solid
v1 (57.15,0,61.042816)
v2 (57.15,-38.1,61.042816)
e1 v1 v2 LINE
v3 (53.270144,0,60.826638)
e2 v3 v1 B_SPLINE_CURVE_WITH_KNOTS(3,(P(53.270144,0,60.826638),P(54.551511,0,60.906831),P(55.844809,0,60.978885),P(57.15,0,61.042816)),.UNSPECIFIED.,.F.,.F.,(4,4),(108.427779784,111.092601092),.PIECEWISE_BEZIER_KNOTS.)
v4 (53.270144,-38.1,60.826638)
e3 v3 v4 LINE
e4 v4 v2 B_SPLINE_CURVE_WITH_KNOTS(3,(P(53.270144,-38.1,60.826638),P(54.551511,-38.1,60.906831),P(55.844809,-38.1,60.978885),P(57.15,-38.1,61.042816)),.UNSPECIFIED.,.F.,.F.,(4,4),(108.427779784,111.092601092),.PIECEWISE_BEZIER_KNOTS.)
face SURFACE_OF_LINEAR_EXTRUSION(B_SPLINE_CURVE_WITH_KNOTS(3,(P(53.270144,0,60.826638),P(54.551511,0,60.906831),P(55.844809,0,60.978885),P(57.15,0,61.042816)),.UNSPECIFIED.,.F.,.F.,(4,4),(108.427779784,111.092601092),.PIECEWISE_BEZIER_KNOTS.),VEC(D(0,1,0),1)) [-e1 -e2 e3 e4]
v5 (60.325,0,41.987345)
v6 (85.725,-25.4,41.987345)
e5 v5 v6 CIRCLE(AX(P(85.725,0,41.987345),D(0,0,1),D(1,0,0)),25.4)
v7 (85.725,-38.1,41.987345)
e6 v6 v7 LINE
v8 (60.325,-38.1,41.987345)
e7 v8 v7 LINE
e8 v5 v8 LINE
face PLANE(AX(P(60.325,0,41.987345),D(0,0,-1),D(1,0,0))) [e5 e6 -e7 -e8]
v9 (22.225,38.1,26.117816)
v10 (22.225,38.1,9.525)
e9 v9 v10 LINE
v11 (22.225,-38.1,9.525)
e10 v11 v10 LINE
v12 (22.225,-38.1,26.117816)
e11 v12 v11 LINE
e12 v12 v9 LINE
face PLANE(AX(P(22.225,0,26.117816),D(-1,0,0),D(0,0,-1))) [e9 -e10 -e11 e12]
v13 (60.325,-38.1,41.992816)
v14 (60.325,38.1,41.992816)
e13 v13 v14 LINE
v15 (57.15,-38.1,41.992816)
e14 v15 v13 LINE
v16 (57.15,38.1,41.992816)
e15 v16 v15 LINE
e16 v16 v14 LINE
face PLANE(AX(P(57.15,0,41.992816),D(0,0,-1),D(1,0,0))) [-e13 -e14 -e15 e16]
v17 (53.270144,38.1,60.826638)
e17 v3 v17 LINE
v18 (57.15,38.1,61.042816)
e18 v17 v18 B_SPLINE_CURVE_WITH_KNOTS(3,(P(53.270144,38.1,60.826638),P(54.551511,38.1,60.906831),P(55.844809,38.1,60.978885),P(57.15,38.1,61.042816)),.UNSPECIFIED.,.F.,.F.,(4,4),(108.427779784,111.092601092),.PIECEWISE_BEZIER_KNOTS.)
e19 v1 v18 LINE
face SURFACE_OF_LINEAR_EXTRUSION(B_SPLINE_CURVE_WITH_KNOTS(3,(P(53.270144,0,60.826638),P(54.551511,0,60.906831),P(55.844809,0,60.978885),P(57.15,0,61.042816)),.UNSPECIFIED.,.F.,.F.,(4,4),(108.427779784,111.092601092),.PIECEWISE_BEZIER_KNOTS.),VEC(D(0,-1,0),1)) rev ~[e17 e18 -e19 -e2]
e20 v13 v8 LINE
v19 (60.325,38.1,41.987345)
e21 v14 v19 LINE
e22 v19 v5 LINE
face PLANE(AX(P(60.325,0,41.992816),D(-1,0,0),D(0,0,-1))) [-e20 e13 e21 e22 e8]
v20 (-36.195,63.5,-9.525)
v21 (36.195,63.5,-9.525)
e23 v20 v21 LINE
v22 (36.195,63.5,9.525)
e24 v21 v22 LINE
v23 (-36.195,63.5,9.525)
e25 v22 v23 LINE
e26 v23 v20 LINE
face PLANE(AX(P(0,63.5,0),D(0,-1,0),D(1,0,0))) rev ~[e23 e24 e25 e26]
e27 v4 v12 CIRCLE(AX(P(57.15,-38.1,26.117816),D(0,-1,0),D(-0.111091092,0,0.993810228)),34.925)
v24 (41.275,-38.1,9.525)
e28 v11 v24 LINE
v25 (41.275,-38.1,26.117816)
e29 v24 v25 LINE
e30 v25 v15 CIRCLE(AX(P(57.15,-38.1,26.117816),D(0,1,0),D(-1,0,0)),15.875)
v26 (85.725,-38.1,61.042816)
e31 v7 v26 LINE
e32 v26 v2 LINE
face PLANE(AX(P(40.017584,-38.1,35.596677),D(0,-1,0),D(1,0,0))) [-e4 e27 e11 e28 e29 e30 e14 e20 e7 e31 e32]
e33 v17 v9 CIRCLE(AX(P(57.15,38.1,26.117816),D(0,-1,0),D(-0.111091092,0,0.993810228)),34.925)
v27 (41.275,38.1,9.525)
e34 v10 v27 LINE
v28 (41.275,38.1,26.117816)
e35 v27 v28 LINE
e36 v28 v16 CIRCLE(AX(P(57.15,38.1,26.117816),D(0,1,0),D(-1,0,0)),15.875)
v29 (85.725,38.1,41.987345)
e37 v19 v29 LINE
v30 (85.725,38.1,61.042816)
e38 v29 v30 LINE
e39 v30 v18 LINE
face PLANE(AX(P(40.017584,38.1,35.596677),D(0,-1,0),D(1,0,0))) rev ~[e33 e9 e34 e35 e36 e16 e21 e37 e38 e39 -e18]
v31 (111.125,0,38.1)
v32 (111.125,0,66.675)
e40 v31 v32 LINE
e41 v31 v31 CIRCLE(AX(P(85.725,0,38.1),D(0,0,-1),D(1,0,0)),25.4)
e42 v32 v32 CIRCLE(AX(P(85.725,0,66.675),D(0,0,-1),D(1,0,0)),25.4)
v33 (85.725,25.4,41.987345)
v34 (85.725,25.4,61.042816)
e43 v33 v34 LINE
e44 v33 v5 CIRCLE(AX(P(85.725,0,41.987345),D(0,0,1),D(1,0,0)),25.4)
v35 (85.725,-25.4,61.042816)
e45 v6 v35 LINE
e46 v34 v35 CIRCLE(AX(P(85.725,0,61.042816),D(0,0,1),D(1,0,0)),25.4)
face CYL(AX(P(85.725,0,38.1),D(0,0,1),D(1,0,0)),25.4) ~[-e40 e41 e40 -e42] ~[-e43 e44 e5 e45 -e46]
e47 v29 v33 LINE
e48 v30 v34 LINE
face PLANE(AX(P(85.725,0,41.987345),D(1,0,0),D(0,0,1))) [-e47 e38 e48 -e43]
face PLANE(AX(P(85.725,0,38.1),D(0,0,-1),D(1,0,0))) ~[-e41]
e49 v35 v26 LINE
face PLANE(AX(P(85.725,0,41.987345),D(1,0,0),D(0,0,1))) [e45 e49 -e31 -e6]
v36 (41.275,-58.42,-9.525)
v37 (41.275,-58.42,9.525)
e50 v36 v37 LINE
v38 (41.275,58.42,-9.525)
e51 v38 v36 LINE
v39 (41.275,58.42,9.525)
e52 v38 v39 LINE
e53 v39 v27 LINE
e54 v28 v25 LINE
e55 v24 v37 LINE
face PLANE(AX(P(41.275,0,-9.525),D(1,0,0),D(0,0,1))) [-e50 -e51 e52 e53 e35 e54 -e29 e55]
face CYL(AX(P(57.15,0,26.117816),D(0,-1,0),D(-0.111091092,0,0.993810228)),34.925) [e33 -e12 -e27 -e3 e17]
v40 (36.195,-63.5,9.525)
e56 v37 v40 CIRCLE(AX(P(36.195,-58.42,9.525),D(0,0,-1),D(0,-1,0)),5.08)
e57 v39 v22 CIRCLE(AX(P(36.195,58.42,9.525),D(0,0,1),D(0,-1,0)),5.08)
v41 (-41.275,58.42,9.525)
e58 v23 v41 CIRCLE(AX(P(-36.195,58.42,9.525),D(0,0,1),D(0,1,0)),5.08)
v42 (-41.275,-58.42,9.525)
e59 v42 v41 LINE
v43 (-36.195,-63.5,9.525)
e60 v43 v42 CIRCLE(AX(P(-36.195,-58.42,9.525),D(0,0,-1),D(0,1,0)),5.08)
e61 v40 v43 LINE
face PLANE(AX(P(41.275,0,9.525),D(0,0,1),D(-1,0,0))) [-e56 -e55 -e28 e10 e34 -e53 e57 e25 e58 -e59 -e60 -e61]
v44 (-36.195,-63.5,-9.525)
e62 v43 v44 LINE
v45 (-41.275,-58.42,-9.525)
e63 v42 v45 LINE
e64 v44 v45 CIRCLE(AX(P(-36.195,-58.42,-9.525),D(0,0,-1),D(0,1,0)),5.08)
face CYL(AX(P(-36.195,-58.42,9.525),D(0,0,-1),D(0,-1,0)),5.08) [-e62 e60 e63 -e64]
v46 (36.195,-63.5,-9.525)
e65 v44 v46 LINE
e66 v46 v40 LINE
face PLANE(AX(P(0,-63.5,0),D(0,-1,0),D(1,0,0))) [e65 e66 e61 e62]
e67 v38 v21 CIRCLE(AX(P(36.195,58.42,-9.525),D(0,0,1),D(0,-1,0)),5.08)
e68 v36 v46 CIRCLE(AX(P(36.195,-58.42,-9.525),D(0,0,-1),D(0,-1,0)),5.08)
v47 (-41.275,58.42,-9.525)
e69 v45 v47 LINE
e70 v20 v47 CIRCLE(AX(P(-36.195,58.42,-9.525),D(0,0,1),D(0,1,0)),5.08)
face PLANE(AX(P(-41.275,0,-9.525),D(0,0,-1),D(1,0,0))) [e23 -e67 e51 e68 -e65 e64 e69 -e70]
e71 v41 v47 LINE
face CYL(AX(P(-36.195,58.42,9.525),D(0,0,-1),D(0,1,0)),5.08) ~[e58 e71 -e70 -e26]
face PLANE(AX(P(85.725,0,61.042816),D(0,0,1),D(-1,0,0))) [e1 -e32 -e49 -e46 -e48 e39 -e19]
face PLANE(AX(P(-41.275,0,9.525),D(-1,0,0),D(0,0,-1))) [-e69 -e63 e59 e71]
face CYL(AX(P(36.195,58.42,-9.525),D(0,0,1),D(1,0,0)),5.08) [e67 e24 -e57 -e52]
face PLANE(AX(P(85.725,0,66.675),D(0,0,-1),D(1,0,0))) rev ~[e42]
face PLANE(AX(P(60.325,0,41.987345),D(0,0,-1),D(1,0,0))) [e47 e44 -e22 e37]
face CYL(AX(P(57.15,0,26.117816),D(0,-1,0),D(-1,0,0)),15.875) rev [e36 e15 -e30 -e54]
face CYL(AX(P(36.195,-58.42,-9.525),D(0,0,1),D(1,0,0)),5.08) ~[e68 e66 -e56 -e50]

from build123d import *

# Parameters (mm, degrees)
F1_DEPTH = 63.5
F2_DEPTH = 38.1
F4_R     = 5.08
F5_R     = 5.08


with BuildPart() as f1:
    # F0 (on Front) → F1 (new body, symmetric)
    with BuildSketch(Plane.XZ):
        Polygon((-41.275, -9.525), (41.275, -9.525), (41.275, 9.525), (22.225, 9.525), (-41.275, 9.525), align=None)
    extrude(amount=F1_DEPTH, both=True)

    # F0 (on Front) → F2 (join, symmetric)
    with BuildSketch(Plane.XZ):
        with BuildLine():
            Line((22.225, 9.525), (41.275, 9.525))
            Line((41.275, 9.525), (41.275, 26.1178162626))
            ThreePointArc((41.275, 26.1178162626), (45.9246798487, 37.3431364139), (57.15, 41.9928162626))
            Line((57.15, 41.9928162626), (60.325, 41.9928162626))
            Line((60.325, 41.9928162626), (60.325, 61.0428162626))
            Line((60.325, 61.0428162626), (57.15, 61.0428162626))
            add(Edge.make_bspline(
                [(53.270143605, 60.8266384747), (54.5515105063, 60.9068312899), (55.8448088672, 60.9788851621), (57.15, 61.0428162626)],
                knots=[108.4277797835, 108.4277797835, 108.4277797835, 108.4277797835, 111.0926010924, 111.0926010924, 111.0926010924, 111.0926010924], degree=3))
            ThreePointArc((53.270143605, 60.8266384747), (31.1186764686, 49.4014117796), (22.225, 26.1178162626))
            Line((22.225, 26.1178162626), (22.225, 9.525))
        make_face()
        Polygon((60.325, 61.0428162626), (60.325, 41.9928162626), (60.325, 41.9873446226), (85.725, 41.9873446226), (85.725, 42.3024737561), (85.725, 51.9704466166), (85.725, 52.3875), (85.725, 61.0428162626), align=None)
    extrude(amount=F2_DEPTH, both=True)

    # F0 (on Front) → F3 (revolve)
    with BuildSketch(Plane.XZ):
        Polygon((85.725, 66.675), (85.725, 61.0428162626), (85.725, 52.3875), (85.725, 51.9704466166), (85.725, 42.3024737561), (85.725, 41.9873446226), (85.725, 38.1), (111.125, 38.1), (111.125, 66.675), align=None)
    revolve(axis=Axis((85.725, 0, 56.7151581313), (0, 0, -1)))

    # F4
    f4_edges = [f1.edges().sort_by_distance(p)[0] for p in [
        (41.275, -63.5, 0),
    ]]
    fillet(f4_edges, radius=F4_R)

    # F5
    f5_edges = [f1.edges().sort_by_distance(p)[0] for p in [
        (-41.275, 63.5, 0),
        (-41.275, -63.5, 0),
        (41.275, 63.5, 0),
    ]]
    fillet(f5_edges, radius=F5_R)


solid = f1.part
